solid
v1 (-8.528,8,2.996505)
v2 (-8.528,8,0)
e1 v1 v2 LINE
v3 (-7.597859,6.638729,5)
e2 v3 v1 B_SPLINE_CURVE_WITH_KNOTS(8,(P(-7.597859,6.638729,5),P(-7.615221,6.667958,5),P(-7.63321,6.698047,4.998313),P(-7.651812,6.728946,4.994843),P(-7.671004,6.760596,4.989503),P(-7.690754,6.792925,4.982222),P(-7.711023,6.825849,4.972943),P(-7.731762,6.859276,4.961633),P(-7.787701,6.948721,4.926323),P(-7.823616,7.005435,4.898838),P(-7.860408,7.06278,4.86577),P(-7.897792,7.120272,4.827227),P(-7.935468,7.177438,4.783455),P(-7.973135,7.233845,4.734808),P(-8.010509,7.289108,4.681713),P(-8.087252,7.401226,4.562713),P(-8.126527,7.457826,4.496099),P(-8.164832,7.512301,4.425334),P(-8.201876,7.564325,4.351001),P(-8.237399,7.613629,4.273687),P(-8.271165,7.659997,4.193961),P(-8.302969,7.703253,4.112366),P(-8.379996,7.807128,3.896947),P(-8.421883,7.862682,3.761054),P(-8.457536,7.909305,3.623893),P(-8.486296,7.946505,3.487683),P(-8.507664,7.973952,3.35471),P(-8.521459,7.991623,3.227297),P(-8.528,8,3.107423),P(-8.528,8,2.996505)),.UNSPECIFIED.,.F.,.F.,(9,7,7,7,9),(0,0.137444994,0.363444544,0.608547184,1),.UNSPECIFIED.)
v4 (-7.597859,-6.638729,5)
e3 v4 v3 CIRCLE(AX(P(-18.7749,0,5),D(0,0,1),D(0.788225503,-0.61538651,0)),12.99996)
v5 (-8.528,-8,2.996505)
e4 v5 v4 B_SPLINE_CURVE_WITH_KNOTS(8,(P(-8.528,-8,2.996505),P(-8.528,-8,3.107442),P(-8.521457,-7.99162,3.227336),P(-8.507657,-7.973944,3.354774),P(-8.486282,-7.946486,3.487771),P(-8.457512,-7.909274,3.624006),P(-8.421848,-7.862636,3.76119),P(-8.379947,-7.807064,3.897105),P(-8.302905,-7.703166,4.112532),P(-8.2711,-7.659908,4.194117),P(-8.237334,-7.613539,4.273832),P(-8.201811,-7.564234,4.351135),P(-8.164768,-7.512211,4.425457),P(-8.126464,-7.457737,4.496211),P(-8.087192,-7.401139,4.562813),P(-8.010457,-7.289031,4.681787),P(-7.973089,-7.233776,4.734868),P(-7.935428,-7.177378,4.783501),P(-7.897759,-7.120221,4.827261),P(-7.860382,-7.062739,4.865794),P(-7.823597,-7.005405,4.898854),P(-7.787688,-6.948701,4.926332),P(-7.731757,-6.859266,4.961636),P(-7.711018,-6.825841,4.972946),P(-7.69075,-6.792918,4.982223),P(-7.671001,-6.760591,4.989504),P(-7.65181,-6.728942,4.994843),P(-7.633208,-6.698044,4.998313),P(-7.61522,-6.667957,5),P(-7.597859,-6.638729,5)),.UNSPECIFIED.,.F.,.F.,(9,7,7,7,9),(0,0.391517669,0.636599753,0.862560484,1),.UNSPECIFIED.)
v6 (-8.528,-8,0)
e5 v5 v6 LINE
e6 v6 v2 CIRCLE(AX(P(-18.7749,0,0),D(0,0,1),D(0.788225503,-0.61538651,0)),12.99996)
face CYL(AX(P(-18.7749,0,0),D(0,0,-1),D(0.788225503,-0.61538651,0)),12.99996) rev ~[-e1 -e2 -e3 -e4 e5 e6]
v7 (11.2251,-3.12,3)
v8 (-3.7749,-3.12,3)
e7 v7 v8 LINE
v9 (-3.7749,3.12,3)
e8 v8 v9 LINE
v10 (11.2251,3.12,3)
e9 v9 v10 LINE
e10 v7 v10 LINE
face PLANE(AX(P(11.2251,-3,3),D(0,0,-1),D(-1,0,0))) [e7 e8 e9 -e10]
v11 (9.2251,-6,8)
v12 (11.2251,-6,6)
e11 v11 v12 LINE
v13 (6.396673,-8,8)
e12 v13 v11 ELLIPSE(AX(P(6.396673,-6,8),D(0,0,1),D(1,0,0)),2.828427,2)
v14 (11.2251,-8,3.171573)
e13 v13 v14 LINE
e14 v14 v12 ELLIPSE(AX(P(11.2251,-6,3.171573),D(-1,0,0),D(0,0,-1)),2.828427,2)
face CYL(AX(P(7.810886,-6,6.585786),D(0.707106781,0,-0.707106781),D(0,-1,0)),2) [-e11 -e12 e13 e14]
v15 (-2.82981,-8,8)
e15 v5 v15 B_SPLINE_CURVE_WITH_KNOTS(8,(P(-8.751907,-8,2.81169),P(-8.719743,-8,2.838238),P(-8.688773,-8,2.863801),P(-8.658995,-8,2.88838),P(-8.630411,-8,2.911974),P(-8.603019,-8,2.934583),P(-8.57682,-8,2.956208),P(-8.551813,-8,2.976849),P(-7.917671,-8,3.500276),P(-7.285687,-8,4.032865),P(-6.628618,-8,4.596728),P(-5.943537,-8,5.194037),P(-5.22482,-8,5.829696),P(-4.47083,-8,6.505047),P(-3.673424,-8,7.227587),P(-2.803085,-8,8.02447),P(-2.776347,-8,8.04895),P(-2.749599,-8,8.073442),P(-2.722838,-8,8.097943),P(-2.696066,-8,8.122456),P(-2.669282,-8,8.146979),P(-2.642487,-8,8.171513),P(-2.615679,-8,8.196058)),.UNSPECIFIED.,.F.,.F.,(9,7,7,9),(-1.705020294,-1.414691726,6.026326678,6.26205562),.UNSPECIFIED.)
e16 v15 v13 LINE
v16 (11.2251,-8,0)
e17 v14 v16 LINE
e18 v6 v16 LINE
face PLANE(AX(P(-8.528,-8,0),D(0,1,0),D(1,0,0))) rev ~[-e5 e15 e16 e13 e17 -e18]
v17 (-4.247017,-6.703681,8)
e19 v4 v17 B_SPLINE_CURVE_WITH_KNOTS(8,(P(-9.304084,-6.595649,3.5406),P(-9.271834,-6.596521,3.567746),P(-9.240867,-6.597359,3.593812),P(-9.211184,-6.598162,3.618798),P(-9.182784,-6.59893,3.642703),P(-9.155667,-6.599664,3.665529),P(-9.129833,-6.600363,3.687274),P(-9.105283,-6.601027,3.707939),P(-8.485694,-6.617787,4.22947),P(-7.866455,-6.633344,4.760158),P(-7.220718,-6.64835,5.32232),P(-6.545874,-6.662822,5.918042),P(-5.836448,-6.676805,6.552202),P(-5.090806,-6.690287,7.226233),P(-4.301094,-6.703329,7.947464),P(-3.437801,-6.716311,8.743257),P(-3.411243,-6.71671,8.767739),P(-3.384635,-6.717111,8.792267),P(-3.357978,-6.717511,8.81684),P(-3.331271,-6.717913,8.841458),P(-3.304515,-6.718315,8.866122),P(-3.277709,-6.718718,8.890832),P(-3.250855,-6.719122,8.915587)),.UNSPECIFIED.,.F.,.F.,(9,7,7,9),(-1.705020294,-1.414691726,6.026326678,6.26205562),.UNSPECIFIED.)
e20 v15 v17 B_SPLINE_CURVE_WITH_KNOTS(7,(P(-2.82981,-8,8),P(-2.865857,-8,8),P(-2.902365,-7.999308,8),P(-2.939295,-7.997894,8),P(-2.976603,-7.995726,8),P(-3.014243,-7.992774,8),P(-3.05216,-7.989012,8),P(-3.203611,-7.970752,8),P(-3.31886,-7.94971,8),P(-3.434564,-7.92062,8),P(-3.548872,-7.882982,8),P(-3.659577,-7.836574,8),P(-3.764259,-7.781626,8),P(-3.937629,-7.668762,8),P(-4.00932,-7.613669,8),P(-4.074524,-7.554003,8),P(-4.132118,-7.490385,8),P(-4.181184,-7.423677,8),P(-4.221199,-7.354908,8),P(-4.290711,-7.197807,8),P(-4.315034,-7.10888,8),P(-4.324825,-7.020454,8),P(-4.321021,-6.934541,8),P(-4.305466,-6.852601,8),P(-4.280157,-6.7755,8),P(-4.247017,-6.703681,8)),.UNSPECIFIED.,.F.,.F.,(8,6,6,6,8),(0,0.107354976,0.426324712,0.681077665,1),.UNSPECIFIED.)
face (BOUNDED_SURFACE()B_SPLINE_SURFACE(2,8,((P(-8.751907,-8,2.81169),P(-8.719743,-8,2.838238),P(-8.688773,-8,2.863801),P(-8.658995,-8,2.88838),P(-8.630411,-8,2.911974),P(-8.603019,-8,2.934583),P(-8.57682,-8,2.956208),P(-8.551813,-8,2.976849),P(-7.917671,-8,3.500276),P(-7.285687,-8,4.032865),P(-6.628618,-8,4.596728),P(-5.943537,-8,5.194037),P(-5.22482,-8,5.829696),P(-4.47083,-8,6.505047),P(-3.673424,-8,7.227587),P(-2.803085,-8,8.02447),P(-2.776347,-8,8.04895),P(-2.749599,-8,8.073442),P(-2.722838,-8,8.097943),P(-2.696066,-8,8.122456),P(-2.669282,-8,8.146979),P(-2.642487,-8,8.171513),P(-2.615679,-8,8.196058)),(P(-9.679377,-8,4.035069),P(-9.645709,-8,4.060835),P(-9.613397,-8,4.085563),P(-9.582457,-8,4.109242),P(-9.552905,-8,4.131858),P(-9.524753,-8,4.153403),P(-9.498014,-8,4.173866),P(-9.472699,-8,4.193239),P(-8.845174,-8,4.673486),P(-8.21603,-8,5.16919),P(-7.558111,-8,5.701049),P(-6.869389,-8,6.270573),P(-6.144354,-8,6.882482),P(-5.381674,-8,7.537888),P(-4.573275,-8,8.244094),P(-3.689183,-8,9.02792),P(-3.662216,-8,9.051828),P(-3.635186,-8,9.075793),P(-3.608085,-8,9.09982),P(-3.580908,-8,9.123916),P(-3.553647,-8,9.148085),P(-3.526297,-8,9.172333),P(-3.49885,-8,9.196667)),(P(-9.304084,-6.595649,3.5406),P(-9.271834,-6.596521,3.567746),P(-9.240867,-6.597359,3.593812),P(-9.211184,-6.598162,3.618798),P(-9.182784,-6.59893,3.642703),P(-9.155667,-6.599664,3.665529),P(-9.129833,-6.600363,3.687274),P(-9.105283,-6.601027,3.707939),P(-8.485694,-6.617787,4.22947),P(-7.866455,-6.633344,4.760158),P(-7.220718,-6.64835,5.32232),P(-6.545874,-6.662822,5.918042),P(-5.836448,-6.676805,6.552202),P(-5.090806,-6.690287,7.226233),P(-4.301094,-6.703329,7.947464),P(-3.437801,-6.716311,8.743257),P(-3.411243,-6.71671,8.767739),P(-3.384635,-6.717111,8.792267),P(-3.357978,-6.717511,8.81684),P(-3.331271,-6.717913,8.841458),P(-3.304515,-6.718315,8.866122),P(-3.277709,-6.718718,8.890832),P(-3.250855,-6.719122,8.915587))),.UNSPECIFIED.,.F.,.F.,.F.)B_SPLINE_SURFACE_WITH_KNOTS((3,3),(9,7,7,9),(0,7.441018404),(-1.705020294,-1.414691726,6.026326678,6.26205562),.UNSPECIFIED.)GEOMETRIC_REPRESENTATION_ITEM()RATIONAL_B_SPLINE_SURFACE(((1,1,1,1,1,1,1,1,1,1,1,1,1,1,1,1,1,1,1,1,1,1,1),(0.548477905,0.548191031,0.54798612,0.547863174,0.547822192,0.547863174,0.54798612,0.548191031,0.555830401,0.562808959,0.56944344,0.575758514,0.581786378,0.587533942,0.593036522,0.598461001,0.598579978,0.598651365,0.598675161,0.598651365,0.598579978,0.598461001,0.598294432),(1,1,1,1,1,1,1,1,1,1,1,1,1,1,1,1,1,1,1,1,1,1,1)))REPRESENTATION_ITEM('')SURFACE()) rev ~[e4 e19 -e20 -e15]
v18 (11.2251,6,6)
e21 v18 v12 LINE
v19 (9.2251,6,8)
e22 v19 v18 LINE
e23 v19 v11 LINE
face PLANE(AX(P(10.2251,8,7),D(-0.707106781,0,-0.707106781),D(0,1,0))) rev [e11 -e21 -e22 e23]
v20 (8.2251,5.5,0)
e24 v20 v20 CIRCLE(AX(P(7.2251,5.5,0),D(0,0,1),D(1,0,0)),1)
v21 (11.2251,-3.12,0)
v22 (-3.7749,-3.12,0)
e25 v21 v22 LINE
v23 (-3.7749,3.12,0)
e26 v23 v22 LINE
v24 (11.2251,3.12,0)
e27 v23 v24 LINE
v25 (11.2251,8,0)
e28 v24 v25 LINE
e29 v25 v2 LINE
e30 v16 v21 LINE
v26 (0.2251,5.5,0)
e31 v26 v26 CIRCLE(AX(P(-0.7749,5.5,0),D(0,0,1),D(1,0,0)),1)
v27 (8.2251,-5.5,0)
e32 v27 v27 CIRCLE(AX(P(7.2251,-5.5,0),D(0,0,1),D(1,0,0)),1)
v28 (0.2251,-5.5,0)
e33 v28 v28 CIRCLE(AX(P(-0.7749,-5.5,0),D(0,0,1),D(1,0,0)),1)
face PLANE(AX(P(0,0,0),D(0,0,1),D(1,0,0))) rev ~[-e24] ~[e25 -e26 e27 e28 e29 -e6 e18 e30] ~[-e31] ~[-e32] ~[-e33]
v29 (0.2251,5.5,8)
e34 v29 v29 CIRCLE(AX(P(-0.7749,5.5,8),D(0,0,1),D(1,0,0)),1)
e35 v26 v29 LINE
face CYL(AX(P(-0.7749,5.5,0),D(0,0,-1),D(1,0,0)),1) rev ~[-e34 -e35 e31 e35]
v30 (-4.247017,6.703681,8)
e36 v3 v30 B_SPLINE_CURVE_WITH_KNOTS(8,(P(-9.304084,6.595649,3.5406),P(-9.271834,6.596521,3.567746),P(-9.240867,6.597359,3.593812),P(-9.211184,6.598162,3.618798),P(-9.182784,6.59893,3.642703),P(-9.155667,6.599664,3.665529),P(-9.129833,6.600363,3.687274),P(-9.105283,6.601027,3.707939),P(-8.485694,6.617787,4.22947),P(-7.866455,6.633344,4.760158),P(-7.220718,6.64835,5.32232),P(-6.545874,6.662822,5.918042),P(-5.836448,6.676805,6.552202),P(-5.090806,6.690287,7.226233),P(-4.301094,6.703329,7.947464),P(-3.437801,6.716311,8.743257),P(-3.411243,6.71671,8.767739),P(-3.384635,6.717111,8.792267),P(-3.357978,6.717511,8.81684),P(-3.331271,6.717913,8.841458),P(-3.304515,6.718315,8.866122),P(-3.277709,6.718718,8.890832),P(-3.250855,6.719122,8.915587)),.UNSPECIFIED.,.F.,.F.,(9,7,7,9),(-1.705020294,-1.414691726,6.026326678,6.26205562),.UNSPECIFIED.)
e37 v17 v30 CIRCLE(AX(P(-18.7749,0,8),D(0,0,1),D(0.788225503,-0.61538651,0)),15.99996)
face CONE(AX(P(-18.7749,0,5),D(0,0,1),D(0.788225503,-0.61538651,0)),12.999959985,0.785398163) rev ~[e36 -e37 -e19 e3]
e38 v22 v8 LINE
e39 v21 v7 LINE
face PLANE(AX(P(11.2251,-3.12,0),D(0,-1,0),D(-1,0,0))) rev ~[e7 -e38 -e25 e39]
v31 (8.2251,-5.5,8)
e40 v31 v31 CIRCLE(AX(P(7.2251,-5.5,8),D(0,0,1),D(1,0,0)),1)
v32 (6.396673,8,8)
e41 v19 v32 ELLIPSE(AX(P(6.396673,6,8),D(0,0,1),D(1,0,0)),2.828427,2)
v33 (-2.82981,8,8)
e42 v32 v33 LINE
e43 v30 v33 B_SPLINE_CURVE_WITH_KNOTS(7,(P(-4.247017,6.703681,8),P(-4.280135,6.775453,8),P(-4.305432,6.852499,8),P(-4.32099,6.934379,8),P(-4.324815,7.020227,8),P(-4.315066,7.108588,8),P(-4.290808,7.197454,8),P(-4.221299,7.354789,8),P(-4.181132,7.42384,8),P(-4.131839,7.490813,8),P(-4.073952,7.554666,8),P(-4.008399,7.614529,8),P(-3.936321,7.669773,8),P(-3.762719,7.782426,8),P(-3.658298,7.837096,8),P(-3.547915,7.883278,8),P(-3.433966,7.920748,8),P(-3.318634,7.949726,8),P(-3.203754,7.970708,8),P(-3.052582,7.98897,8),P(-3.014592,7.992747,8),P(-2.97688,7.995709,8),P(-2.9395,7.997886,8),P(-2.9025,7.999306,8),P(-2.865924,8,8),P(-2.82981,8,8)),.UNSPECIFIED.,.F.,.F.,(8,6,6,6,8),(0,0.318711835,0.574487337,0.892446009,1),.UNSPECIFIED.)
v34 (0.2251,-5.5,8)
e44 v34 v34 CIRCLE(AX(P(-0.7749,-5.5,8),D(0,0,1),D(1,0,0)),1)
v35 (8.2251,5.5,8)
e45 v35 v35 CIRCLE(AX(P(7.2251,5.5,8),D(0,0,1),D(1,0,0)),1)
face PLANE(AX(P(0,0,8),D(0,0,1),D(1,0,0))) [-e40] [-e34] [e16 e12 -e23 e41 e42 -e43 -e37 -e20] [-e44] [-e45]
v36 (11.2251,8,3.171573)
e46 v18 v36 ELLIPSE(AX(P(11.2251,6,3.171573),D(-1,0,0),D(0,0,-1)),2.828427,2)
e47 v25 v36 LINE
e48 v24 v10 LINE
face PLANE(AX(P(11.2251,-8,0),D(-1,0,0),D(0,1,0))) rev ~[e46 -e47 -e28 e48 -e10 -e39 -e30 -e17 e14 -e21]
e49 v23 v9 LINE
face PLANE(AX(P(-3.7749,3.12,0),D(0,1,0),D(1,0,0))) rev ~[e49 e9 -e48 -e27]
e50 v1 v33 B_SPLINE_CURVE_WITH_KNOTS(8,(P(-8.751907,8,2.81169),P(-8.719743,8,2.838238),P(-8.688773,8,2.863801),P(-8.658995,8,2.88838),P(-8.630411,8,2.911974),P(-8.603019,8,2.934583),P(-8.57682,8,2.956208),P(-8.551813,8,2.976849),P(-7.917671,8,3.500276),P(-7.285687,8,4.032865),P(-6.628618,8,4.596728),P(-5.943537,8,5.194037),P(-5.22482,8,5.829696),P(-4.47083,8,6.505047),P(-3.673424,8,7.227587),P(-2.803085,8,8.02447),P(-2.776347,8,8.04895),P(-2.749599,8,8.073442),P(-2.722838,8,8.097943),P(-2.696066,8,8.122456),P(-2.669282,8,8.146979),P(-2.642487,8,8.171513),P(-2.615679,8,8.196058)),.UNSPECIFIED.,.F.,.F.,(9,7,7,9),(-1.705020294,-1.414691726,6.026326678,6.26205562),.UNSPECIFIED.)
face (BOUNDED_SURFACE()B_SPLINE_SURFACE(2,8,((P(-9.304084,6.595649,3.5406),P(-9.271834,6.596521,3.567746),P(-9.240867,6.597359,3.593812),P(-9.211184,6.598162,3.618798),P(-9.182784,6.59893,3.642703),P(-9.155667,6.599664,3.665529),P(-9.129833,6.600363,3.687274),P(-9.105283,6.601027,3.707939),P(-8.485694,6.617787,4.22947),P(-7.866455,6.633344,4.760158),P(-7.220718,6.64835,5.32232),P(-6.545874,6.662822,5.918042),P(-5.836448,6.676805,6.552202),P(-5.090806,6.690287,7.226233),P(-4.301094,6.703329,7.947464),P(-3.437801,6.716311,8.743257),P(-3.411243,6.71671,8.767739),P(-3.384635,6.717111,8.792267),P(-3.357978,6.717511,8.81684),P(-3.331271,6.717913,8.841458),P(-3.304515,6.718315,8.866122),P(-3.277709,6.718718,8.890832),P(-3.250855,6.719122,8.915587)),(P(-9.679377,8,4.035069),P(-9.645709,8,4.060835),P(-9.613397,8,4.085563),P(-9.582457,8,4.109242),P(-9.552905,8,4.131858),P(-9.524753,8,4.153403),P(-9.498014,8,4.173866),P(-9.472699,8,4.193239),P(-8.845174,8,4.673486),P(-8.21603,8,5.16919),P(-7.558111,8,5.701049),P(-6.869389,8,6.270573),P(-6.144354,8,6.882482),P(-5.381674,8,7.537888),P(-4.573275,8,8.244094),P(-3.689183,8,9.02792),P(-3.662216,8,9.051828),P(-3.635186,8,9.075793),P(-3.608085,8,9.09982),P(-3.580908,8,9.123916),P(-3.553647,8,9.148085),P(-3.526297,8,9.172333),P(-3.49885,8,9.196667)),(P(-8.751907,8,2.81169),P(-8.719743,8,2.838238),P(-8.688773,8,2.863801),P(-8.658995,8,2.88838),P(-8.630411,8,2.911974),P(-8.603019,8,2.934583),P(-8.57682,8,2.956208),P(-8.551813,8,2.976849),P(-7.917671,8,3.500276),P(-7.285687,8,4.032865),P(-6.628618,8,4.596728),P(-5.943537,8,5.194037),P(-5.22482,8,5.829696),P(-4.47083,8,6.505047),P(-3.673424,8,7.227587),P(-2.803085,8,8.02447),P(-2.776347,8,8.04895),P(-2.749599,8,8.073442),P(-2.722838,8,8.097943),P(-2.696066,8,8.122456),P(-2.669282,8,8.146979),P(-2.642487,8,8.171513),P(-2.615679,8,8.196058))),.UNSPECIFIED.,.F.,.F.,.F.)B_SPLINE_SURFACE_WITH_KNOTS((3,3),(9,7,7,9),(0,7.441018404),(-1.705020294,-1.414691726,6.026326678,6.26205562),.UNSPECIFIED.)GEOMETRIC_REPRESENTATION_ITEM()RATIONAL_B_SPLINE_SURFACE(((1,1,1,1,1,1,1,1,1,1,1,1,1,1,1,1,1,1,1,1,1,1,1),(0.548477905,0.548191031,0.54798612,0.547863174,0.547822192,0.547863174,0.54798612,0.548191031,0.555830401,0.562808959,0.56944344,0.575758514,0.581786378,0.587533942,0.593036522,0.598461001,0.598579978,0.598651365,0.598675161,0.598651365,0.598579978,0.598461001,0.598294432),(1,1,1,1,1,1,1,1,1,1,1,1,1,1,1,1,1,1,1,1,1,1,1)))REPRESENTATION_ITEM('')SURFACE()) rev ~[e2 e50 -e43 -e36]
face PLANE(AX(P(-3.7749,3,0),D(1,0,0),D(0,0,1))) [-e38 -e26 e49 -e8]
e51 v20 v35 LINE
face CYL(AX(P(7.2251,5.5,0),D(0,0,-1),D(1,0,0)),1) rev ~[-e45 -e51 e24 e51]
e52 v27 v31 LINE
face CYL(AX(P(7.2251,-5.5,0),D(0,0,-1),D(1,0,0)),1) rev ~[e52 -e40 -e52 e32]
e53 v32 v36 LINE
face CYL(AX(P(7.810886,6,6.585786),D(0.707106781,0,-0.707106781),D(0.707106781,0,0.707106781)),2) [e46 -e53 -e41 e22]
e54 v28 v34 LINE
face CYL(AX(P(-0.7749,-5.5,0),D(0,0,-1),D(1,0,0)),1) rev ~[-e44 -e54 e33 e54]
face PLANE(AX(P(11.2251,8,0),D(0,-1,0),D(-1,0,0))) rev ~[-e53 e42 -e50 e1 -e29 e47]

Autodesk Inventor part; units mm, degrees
ref_plane "YZ Plane" through (0, 0, 0) normal (1, 0, 0) x (0, 1, 0)
ref_plane "XZ Plane" through (0, 0, 0) normal (0, 1, 0) x (-1, 0, 0)
ref_plane "XY Plane" through (0, 0, 0) normal (0, 0, 1) x (1, 0, 0)
sketch "Sketch1" plane through (0, 0, 0) normal (0, 0, 1) x (1, 0, 0)
  circle A0 centre (-0.7749, 5.5) radius 1 projected
  circle A1 centre (7.2251, 5.5) radius 1 projected
  circle A2 centre (-0.7749, -5.5) radius 1 projected
  circle A3 centre (7.2251, -5.5) radius 1 projected
  line L0 (11.2251, -3) -> (-3.7749, -3) projected
  line L1 (-3.7749, -3) -> (-3.7749, 3) projected
  line L2 (-3.7749, 3) -> (11.2251, 3) projected
  line L3 (11.2251, 3) -> (11.2251, 8) projected
  line L4 (11.2251, 8) -> (-8.528, 8) projected
  arc A4 (-8.528, -8) -> (-8.528, 8) centre (-18.7749, 0) ccw projected
  line L5 (-8.528, -8) -> (11.2251, -8) projected
  line L6 (11.2251, -8) -> (11.2251, -3) projected
  point P0 (0, 0)
extrude "Extrusion1" add sketch "Sketch1" along normal blind 3
sketch "Sketch2" plane through (0, 0, 3) normal (0, 0, 1) x (1, 0, 0)
  line L0 (11.2251, -8) -> (11.2251, -3) projected
  line L1 (11.2251, -3) -> (-3.7749, -3) projected
  line L2 (-3.7749, -3) -> (-3.7749, 3) projected
  line L3 (-3.7749, 3) -> (11.2251, 3) projected
  line L4 (11.2251, 3) -> (11.2251, 8) projected
  line L5 (11.2251, 8) -> (-8.528, 8) projected
  arc A0 (-8.528, -8) -> (-8.528, 8) centre (-18.7749, 0) ccw projected
  line L6 (-8.528, -8) -> (11.2251, -8) projected
  circle A1 centre (-0.7749, 5.5) radius 1 projected
  circle A2 centre (7.2251, 5.5) radius 1 projected
  circle A3 centre (-0.7749, -5.5) radius 1 projected
  circle A4 centre (7.2251, -5.5) radius 1 projected
  line L7 (11.2251, -8) -> (11.2251, -3) projected
  line L8 (11.2251, 3) -> (11.2251, 8) projected
  line L9 (11.2251, -8) -> (11.2251, 8)
  point P0 (0, 0)
extrude "Extrusion2" add sketch "Sketch2" along normal blind 5
chamfer "Chamfer1" distance 3 angle 45 1 edges at (-5.7749, 0, 8)
fillet "Fillet1" radius 1 2 edges at (-6.817, -8, 6.3872) (-6.817, 8, 6.3872)
chamfer "Chamfer2" distance 2 angle 45 1 edges at (11.2251, 0, 8)
fillet "Fillet2" radius 2 2 edges at (10.2251, -8, 7) (10.2251, 8, 7)
thicken "Thicken1" operation add thickness 0.12 both sides no extend neighbours yes toward (0, 1, 0) faces at (1.2251, 3, 1)
thicken "Thicken2" operation add thickness 0.12 both sides no extend neighbours yes toward (0, -1, 0) faces at (6.2251, -3, 1)
properties part number "armtip_2"
